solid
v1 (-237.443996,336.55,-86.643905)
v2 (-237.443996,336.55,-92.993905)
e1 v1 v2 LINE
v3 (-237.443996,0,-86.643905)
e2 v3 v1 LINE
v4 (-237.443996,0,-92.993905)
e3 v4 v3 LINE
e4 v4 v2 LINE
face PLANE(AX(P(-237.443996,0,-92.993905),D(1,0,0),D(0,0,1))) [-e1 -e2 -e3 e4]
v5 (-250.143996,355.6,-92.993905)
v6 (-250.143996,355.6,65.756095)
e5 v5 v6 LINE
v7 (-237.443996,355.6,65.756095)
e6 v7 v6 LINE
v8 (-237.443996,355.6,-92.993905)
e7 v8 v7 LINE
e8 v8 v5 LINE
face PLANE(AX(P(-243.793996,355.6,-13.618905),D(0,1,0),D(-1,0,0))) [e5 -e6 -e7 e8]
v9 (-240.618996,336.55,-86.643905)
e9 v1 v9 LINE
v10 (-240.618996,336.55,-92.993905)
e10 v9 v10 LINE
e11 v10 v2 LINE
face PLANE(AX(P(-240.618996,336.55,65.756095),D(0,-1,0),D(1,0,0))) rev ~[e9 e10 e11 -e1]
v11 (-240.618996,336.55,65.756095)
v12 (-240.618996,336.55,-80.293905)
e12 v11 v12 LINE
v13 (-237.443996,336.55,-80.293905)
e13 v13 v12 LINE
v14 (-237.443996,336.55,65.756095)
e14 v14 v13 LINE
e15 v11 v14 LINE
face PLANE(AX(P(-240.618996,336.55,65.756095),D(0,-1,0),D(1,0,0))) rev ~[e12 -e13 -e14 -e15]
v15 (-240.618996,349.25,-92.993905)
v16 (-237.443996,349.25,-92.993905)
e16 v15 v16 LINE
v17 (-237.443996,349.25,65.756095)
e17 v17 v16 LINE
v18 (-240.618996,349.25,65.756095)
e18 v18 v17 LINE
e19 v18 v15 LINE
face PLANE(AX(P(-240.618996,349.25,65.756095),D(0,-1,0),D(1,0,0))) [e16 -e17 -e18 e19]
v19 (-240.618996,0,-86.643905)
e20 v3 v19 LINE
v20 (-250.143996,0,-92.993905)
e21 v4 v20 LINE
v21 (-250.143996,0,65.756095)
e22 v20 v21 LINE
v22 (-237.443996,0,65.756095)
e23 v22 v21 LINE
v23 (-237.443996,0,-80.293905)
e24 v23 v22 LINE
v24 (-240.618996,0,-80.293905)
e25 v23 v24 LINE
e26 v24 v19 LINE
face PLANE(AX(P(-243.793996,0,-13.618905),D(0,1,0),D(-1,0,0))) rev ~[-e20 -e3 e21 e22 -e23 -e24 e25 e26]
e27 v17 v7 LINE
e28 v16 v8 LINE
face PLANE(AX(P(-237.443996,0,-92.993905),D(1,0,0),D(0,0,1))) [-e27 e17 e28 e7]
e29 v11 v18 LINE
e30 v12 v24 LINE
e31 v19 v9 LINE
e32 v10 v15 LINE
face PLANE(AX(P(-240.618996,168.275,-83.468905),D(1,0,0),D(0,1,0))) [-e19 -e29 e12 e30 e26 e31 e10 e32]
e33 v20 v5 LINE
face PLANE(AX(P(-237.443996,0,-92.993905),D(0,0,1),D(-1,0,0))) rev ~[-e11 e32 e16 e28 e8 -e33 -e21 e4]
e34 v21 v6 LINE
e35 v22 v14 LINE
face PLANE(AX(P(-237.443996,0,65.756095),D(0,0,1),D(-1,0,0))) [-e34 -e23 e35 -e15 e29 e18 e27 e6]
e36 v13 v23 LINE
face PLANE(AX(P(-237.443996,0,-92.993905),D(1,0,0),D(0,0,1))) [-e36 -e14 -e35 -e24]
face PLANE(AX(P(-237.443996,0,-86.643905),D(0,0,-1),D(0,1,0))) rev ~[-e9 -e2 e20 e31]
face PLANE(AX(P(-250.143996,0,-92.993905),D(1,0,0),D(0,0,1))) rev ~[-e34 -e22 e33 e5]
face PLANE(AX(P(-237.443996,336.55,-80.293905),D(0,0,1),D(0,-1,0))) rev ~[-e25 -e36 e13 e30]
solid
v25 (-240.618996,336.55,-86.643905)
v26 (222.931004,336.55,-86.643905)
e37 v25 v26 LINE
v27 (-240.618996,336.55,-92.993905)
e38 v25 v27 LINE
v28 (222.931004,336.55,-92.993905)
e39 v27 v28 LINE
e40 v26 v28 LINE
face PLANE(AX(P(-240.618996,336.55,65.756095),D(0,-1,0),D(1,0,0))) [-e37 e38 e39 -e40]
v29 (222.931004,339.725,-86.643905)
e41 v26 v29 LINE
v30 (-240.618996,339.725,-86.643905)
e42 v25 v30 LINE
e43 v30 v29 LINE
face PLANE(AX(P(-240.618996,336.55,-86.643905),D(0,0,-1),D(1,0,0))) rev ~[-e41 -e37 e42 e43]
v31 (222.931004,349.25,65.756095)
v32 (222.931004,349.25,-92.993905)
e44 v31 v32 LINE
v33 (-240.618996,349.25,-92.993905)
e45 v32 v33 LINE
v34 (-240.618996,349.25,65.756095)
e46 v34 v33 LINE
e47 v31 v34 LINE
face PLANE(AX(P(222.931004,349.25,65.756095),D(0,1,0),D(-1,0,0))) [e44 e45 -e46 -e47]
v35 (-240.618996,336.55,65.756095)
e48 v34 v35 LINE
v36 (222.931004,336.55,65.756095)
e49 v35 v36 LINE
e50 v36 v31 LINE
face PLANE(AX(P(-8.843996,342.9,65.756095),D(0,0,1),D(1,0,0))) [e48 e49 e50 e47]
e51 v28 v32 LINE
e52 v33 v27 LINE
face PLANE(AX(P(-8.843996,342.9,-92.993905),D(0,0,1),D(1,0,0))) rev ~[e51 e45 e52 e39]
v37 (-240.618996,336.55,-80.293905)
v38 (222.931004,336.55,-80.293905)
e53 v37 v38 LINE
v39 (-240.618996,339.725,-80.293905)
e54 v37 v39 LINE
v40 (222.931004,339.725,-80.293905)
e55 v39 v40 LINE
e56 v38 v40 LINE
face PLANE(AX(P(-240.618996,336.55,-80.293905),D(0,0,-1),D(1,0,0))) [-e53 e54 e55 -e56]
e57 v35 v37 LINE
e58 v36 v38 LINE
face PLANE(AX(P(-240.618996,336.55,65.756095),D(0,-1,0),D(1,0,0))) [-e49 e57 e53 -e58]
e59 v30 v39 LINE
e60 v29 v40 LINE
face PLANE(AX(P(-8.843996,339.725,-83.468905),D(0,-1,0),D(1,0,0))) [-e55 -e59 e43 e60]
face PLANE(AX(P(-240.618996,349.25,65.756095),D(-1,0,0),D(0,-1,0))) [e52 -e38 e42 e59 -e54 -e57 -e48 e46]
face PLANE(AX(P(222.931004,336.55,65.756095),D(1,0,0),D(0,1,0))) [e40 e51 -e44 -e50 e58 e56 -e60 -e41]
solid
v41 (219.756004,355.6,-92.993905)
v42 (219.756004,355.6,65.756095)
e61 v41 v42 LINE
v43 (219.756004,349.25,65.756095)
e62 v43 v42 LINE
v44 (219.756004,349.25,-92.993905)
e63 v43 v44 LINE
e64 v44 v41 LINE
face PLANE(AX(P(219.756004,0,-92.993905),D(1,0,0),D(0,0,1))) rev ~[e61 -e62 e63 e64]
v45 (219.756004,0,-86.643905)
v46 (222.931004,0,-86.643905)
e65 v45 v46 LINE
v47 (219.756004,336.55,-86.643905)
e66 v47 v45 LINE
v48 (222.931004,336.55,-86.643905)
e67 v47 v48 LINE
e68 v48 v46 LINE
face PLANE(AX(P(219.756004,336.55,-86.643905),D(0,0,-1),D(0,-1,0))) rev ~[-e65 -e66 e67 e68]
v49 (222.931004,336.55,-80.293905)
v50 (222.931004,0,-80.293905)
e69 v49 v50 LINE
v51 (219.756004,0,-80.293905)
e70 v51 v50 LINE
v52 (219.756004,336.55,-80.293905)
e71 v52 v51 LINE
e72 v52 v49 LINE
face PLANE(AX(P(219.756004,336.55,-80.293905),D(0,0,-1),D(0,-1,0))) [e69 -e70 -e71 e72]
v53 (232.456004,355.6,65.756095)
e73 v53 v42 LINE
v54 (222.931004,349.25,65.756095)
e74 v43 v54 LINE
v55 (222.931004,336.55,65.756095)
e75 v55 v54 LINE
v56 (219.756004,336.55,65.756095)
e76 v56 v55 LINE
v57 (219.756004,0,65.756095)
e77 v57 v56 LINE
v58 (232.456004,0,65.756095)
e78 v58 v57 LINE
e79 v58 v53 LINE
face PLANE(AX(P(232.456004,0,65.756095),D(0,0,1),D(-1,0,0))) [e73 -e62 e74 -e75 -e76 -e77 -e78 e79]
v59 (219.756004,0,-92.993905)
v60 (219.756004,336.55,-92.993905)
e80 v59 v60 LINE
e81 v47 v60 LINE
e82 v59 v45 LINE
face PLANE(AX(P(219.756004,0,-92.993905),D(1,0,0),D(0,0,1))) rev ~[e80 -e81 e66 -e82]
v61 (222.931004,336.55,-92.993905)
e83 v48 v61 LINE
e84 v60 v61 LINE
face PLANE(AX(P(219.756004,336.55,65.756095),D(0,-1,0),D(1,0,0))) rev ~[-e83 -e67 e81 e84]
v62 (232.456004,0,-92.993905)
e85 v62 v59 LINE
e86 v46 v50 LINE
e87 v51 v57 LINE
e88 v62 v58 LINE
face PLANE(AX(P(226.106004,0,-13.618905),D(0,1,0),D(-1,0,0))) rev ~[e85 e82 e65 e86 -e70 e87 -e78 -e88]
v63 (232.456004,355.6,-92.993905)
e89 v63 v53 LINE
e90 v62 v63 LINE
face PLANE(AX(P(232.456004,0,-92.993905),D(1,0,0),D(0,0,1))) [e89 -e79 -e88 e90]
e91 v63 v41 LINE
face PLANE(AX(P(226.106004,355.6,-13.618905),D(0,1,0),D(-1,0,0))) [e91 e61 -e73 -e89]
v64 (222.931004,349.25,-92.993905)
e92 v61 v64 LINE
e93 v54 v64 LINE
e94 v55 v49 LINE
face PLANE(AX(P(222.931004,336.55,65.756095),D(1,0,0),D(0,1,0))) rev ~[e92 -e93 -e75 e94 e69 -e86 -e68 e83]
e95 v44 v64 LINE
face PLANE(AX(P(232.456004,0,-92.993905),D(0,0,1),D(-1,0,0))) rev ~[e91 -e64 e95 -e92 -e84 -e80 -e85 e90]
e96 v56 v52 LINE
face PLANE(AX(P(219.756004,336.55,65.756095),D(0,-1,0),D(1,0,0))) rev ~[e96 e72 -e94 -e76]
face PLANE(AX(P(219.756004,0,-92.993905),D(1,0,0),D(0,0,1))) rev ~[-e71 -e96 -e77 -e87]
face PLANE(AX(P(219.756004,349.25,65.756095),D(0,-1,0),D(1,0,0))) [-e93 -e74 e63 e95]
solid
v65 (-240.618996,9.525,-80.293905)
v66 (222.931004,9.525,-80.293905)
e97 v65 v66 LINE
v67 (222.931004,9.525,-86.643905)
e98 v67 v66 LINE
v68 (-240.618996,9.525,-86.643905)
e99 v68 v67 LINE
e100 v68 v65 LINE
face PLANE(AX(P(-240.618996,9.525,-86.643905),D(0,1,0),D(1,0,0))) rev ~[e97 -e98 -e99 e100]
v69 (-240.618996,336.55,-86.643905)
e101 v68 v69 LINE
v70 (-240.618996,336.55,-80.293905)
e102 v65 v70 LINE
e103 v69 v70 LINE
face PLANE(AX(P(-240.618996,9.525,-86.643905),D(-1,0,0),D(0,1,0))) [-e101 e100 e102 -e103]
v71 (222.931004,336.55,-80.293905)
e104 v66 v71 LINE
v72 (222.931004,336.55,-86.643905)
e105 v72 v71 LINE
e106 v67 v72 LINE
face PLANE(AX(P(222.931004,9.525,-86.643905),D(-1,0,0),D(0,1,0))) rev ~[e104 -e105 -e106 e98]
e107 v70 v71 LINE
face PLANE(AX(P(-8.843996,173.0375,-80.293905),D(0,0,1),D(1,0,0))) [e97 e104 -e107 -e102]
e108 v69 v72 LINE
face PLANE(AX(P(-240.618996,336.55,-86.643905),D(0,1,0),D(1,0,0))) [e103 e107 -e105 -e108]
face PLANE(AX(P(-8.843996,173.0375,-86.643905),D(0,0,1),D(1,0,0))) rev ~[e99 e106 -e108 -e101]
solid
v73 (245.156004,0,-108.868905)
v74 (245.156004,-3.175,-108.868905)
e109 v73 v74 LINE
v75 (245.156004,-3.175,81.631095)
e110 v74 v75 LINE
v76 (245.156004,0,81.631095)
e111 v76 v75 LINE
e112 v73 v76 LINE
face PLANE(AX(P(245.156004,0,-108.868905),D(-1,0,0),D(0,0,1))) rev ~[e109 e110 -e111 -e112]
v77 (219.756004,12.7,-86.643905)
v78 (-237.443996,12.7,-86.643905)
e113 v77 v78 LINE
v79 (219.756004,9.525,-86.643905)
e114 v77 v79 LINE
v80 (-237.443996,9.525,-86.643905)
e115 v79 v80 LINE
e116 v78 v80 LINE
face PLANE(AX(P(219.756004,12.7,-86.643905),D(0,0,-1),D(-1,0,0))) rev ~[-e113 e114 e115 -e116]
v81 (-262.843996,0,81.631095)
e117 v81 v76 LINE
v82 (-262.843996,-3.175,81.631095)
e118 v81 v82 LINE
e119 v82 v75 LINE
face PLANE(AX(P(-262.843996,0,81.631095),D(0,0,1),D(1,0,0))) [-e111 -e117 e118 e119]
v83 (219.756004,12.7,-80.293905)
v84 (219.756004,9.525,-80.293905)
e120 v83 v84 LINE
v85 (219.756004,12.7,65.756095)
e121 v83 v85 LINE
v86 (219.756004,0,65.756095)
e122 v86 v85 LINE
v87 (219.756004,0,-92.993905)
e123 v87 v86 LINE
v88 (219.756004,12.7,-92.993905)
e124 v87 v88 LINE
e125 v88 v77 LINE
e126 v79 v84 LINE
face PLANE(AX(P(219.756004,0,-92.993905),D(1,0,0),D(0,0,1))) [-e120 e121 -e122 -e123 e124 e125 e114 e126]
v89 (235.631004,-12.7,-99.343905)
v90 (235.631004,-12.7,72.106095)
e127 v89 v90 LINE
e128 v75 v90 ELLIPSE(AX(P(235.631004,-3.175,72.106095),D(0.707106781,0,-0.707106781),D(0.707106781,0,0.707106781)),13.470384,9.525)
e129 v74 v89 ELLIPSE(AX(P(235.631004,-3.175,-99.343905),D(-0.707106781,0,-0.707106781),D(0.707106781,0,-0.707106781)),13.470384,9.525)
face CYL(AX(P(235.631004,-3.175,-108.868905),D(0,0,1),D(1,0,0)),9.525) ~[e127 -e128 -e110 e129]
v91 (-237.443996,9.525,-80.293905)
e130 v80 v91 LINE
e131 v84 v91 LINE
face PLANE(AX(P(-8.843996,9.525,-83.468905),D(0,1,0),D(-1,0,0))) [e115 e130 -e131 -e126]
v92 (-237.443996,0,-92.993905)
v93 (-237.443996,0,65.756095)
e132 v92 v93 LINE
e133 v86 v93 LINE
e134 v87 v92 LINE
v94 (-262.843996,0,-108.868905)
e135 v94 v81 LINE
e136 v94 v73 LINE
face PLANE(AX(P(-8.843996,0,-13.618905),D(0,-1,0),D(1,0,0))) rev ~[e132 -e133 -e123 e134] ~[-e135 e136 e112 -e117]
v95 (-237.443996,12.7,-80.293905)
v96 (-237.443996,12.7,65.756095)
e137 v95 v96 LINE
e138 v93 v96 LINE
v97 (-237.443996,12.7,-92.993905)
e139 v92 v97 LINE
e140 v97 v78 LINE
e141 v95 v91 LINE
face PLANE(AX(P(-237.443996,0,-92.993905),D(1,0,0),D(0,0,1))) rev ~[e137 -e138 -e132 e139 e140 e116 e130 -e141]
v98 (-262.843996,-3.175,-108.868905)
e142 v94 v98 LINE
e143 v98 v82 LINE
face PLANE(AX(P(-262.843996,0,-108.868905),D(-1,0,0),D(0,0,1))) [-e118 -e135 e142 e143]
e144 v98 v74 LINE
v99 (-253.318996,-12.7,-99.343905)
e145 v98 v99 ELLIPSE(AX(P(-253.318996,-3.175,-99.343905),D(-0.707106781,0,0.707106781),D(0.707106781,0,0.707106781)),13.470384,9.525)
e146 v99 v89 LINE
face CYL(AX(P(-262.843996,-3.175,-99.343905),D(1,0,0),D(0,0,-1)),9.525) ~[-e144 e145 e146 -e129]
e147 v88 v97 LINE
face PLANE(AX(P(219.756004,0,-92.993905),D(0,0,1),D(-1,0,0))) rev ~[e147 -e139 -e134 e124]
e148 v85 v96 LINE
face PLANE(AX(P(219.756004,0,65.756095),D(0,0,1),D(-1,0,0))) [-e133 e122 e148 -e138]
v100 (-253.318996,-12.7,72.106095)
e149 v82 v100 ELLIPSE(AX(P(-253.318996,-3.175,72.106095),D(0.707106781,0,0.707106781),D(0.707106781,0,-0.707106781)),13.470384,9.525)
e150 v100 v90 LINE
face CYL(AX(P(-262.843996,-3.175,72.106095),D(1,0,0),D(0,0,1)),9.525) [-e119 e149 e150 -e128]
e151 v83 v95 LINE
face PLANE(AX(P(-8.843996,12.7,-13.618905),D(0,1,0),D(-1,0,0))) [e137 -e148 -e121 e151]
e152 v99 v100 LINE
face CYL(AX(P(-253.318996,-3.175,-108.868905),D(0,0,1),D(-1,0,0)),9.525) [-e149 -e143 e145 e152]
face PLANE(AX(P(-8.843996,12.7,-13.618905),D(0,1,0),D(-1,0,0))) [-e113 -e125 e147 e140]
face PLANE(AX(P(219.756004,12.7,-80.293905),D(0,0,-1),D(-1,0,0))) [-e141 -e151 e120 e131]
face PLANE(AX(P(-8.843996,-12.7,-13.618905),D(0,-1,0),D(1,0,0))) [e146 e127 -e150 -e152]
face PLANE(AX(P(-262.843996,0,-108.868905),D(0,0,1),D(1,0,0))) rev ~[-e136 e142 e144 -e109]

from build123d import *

# Parameters (mm, degrees)
F0_W      = 508
F0_H      = 190.5
F1_DEPTH  = 12.7
F2_R      = 9.525
F3_W      = 457.2
F3_H      = 158.75
F4_DEPTH  = 12.7
F5_W      = 12.7
F5_H      = 158.75
F6_DEPTH  = 355.6
F7_W      = 12.7
F7_H      = 158.75
F8_DEPTH  = 355.6
F9_W      = 3.175
F9_H      = 12.7
F10_DEPTH = 174.626
F11_W     = 3.175
F11_H     = 12.7
F12_DEPTH = 174.626
F14_DEPTH = 158.75
F15_W     = 463.55
F15_H     = 6.35
F16_DEPTH = 3.175
F17_W     = 336.55
F17_H     = 6.35
F18_DEPTH = 3.175
F20_DEPTH = 3.175
F21_W     = 457.2
F21_H     = 6.35
F22_DEPTH = 3.175
F23_W     = 463.55
F23_H     = 327.025
F24_DEPTH = 6.35


# Not quite as in the source:
# - a feature names something its author has since deleted; it is built from what else it names


with BuildPart() as f1:
    # F0 (on Front) → F1 (new body)
    with BuildSketch(Plane.XZ):
        with Locations((-8.8439956307, -13.6189054852)):
            Rectangle(F0_W, F0_H)
    extrude(amount=F1_DEPTH)

    # F2
    f2_edges = [f1.edges().sort_by_distance(p)[0] for p in [
        (-8.843996, -12.7, 81.631095),
        (-262.843996, -12.7, -13.618905),
        (-8.843996, -12.7, -108.868905),
        (245.156004, -12.7, -13.618905),
    ]]
    fillet(f2_edges, radius=F2_R)

    # F3 (on face) → F4 (join)
    with BuildSketch(Plane(origin=(0, 0, 0), x_dir=(-1, 0, 0), z_dir=(0, 1, 0))):
        with Locations((8.8439956307, -13.6189054852)):
            Rectangle(F3_W, F3_H)
    extrude(amount=F4_DEPTH)

    # F21 (on face) → F22 (cut)
    with BuildSketch(Plane(origin=(0, 12.7, 0), x_dir=(-1, 0, 0), z_dir=(0, 1, 0))):
        with Locations((8.8439956307, -83.4689054852)):
            Rectangle(F21_W, F21_H)
    extrude(amount=-F22_DEPTH, mode=Mode.SUBTRACT)


with BuildPart() as f6:
    # F5 (on face) → F6 (new body)
    with BuildSketch(Plane(origin=(0, 0, 0), x_dir=(-1, 0, 0), z_dir=(0, 1, 0))):
        with Locations((-226.1060043693, -13.6189054852)):
            Rectangle(F5_W, F5_H)
    extrude(amount=F6_DEPTH)

    # F11 (on face) → F12 (cut, through all)
    with BuildSketch(Plane.XY.offset(65.7560945148)):
        with Locations((221.3435043693, 342.9)):
            Rectangle(F11_W, F11_H)
    extrude(amount=-F12_DEPTH, mode=Mode.SUBTRACT)

    # F17 (on face) → F18 (cut)
    with BuildSketch(Plane(origin=(219.7560043693, 0, 0), x_dir=(0, -1, 0), z_dir=(-1, 0, 0))):
        with Locations((-168.275, -83.4689054852)):
            Rectangle(F17_W, F17_H)
    extrude(amount=-F18_DEPTH, mode=Mode.SUBTRACT)


with BuildPart() as f8:
    # F7 (on face) → F8 (new body)
    with BuildSketch(Plane(origin=(0, 0, 0), x_dir=(-1, 0, 0), z_dir=(0, 1, 0))):
        with Locations((243.7939956307, -13.6189054852)):
            Rectangle(F7_W, F7_H)
    extrude(amount=F8_DEPTH)

    # F9 (on face) → F10 (cut, through all)
    with BuildSketch(Plane.XY.offset(65.7560945148)):
        with Locations((-239.0314956307, 342.9)):
            Rectangle(F9_W, F9_H)
    extrude(amount=-F10_DEPTH, mode=Mode.SUBTRACT)

    # F19 (on face) → F20 (cut)
    with BuildSketch(Plane.YZ.offset(-237.4439956307)):
        Polygon((0, -85.2191895247), (0, -86.6439054852), (5.2507231012, -86.6439054852), (336.55, -86.6439054852), (336.55, -80.2939054852), (0, -80.2939054852), align=None)
    extrude(amount=-F20_DEPTH, mode=Mode.SUBTRACT)


with BuildPart() as f14:
    # F13 (on face) → F14 (new body)
    with BuildSketch(Plane.XY.offset(65.7560945148)):
        Polygon((-237.4439956307, 349.25), (-240.6189956307, 349.25), (-240.6189956307, 336.55), (-237.4439956307, 336.55), (222.9310043693, 336.55), (222.9310043693, 349.25), align=None)
    extrude(amount=-F14_DEPTH)

    # F15 (on face) → F16 (cut)
    with BuildSketch(Plane.XZ.offset(-336.55)):
        with Locations((-8.8439956307, -83.4689054852)):
            Rectangle(F15_W, F15_H)
    extrude(amount=-F16_DEPTH, mode=Mode.SUBTRACT)


with BuildPart() as f24:
    # F23 (on face) → F24 (new body)
    with BuildSketch(Plane.XY.offset(-86.6439054852)):
        with Locations((-8.8439956307, 173.0375)):
            Rectangle(F23_W, F23_H)
    extrude(amount=F24_DEPTH)


solid = Compound([f1.part, f6.part, f8.part, f14.part, f24.part])
